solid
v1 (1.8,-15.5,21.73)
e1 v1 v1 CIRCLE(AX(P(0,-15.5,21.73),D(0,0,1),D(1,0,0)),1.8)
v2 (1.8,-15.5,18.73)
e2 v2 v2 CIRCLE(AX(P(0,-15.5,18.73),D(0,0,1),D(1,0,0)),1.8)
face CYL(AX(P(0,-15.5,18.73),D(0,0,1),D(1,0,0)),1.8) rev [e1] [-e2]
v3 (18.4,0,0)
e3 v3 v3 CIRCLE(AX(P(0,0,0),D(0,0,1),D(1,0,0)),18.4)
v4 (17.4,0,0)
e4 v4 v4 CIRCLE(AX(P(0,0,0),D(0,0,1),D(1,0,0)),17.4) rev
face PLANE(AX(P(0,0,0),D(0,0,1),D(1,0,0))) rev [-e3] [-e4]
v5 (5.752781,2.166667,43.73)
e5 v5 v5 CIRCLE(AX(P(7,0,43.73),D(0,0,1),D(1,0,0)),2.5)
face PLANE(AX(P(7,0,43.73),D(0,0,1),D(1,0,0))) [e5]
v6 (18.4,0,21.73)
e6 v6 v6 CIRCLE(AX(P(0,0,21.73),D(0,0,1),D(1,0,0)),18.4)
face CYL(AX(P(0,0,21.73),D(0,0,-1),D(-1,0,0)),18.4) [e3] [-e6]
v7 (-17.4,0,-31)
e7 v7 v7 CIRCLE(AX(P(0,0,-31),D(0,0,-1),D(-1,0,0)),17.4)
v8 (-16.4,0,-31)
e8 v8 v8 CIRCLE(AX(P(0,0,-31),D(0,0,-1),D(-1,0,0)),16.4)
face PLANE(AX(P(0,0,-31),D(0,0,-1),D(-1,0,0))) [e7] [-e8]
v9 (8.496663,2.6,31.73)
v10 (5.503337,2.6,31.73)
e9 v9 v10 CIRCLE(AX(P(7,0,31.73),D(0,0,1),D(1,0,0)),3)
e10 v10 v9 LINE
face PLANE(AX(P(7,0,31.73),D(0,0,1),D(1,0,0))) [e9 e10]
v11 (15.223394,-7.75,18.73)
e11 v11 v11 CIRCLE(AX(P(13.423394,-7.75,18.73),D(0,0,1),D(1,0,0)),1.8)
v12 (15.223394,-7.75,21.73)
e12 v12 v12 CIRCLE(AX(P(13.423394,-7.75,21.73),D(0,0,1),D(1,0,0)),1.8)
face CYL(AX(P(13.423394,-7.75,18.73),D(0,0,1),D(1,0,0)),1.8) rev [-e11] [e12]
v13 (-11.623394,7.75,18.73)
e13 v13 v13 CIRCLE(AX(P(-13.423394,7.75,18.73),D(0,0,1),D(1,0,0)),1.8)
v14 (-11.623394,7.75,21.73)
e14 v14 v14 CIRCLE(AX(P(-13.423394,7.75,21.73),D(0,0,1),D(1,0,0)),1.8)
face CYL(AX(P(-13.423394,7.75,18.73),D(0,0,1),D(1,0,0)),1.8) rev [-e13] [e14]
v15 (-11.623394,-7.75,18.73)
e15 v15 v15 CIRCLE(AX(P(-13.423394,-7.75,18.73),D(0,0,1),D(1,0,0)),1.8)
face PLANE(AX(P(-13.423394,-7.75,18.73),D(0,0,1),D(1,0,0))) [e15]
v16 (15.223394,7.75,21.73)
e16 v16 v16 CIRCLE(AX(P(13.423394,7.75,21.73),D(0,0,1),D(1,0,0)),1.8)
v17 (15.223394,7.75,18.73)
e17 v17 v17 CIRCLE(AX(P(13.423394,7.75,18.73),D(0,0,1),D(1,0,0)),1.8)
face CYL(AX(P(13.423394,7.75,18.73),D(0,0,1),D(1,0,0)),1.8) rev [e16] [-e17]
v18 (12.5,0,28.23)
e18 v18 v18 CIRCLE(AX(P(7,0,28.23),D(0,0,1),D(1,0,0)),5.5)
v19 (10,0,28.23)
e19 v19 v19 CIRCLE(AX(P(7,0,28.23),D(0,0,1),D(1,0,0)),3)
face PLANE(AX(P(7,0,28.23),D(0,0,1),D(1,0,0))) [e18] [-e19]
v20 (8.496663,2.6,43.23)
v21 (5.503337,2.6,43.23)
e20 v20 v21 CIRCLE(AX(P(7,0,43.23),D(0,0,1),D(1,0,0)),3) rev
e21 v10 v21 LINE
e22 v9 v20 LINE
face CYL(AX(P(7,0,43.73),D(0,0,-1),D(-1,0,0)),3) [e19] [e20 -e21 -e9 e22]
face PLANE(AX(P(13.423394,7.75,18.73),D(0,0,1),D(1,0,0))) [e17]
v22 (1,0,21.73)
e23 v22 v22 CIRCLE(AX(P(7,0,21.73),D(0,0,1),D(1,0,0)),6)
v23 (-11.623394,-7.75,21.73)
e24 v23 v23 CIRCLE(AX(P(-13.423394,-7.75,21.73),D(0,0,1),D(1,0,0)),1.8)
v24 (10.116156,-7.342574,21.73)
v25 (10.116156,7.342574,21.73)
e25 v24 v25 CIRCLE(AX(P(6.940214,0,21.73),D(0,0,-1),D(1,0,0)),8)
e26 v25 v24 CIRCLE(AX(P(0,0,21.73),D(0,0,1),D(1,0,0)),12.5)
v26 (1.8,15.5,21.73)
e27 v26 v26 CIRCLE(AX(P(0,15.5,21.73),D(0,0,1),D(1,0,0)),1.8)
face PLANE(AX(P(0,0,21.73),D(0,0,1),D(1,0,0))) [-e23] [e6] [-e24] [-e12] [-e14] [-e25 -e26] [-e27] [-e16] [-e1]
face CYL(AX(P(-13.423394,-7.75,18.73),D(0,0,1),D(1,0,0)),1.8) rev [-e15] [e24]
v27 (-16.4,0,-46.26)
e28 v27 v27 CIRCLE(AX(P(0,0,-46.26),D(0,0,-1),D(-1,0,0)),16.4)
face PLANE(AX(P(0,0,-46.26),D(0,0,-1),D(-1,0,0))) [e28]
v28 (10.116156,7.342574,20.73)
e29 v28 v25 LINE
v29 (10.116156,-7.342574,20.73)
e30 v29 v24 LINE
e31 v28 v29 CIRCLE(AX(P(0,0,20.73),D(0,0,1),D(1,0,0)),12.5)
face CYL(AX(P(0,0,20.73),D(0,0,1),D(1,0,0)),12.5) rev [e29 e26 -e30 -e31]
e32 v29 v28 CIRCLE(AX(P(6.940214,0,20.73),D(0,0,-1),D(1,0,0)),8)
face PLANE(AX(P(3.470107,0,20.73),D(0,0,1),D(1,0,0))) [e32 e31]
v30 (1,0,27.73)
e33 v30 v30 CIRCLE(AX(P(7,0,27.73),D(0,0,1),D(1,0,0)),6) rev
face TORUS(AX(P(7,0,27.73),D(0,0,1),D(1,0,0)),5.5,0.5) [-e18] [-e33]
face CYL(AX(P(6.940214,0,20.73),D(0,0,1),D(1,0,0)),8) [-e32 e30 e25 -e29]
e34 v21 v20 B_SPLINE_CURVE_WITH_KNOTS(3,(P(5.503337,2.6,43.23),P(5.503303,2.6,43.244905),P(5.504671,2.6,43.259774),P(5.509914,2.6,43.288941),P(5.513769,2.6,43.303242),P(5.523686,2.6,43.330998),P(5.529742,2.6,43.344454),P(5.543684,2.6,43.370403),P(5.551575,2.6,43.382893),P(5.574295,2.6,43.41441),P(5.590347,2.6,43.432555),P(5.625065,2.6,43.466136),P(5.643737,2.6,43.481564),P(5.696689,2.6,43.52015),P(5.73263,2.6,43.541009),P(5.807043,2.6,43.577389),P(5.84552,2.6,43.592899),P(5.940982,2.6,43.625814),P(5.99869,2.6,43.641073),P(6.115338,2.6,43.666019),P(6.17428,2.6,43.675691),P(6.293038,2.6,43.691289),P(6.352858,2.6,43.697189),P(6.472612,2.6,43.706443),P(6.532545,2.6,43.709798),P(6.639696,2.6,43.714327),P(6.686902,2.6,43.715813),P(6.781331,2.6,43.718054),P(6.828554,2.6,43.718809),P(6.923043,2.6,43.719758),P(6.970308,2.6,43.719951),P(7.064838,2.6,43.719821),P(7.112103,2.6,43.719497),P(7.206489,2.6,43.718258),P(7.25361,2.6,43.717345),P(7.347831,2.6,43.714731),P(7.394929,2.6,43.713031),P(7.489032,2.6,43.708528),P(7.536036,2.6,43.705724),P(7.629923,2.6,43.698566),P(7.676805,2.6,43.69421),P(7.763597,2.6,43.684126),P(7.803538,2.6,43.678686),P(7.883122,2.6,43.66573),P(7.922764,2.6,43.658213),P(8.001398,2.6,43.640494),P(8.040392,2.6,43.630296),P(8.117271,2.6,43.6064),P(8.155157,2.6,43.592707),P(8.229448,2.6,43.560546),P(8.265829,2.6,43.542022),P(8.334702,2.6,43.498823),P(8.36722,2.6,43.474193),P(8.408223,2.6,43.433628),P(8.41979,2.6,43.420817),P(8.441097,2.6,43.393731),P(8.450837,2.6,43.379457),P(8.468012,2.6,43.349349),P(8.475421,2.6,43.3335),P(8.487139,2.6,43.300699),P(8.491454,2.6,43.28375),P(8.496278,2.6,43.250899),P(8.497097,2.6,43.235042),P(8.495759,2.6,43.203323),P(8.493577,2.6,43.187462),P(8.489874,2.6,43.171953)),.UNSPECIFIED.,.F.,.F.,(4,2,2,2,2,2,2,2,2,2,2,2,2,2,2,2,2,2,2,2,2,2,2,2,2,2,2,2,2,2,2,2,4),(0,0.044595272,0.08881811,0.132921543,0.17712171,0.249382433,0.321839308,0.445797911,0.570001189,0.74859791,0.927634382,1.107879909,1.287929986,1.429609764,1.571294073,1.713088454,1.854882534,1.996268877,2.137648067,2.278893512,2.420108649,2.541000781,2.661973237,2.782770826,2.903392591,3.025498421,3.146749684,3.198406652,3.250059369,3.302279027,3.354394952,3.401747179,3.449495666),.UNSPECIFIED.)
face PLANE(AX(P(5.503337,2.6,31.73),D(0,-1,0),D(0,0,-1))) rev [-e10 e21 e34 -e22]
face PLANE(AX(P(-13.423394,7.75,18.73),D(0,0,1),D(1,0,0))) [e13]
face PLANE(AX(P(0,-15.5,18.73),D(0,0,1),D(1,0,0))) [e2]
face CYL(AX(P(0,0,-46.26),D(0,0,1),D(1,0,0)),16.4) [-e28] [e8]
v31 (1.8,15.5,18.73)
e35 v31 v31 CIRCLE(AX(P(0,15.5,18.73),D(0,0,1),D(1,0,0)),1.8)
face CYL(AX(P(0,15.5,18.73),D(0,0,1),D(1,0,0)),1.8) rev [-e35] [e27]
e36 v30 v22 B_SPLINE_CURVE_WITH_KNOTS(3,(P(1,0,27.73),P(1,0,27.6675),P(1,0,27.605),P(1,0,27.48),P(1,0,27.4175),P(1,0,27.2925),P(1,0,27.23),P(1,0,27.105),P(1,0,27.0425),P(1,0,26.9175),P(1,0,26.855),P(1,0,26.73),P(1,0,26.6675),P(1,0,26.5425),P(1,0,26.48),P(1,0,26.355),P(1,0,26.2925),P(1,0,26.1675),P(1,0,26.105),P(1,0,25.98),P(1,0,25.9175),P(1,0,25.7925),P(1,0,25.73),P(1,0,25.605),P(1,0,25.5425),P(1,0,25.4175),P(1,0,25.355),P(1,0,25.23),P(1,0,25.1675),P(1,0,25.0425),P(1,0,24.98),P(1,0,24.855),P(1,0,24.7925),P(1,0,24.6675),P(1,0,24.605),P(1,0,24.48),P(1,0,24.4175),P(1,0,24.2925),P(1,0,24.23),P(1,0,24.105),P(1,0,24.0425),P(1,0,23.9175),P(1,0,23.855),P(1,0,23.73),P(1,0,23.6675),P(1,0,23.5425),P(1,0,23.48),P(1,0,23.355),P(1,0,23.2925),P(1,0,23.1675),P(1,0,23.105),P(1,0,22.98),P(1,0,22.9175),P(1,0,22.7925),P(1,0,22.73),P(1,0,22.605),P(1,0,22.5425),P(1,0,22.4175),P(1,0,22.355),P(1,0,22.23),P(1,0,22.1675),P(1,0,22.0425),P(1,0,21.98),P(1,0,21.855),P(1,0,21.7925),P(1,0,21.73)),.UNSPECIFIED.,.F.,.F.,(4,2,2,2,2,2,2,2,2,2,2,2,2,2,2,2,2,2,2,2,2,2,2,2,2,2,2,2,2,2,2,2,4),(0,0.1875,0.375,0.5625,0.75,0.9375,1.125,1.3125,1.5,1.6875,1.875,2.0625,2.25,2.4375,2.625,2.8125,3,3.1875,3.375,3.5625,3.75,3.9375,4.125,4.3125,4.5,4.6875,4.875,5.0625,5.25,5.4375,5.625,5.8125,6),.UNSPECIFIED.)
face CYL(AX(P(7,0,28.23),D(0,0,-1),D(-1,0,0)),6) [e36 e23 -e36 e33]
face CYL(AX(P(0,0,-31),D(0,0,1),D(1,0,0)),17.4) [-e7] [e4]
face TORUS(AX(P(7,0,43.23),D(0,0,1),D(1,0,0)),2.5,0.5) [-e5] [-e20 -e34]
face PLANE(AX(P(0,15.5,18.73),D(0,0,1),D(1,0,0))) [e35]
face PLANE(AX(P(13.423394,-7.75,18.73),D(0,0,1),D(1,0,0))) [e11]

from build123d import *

# Parameters (mm, degrees)
SKETCH1_R            = 18.4
BOSS_EXTRUDE1_DEPTH  = 21.73
SKETCH2_R            = 17.4
BOSS_EXTRUDE2_DEPTH  = 31
SKETCH3_R            = 6
BOSS_EXTRUDE3_DEPTH  = 6.5
FILLET1_R            = 0.5
SKETCH4_R            = 3
BOSS_EXTRUDE4_DEPTH  = 15.5
CUT_EXTRUDE1_START   = -12
CUT_EXTRUDE1_DEPTH   = 12
CUT_EXTRUDE2_DEPTH   = 1
SKETCH9_R            = 4
BOSS_EXTRUDE5_DEPTH  = 1
FILLET2_R            = 0.5
SKETCH10_R           = 14
BOSS_EXTRUDE6_DEPTH  = 1.5
SKETCH11_W           = 3.5
SKETCH11_H           = 1
BOSS_EXTRUDE7_DEPTH  = 5.6
FILLET3_R            = 0.5
SKETCH13_R           = 9
BOSS_EXTRUDE8_DEPTH  = 3
SKETCH14_R           = 1.5
BOSS_EXTRUDE9_DEPTH  = 8.55
FILLET4_R            = 0.5
SKETCH15_R           = 16.4
BOSS_EXTRUDE10_DEPTH = 15.26
SKETCH17_R           = 1.8
CUT_EXTRUDE3_DEPTH   = 3


with BuildPart() as part:
    # Sketch1 → Boss-Extrude1 (new body)
    with BuildSketch(Plane.XY):
        Circle(SKETCH1_R)
    extrude(amount=BOSS_EXTRUDE1_DEPTH)

    # Sketch2 → Boss-Extrude2 (add)
    with BuildSketch(Plane(origin=(0, 0, 0), x_dir=(-1, 0, 0), z_dir=(0, 0, -1))):
        with Locations(Location((0, 0, 0), (0, 0, 180))):
            Circle(SKETCH2_R)
    extrude(amount=BOSS_EXTRUDE2_DEPTH)

    # Sketch3 → Boss-Extrude3 (add)
    with BuildSketch(Plane.XY.offset(21.73)):
        with Locations(Location((7, 0, 0), (0, 0, 180))):
            Circle(SKETCH3_R)
    extrude(amount=BOSS_EXTRUDE3_DEPTH)

    # Fillet1
    fillet1_edges = [part.edges().sort_by_distance(p)[0] for p in [
        (13, 0, 28.23),
    ]]
    fillet(fillet1_edges, radius=FILLET1_R)

    # Sketch4 → Boss-Extrude4 (add)
    with BuildSketch(Plane.XY.offset(28.23)):
        with Locations((7, 0)):
            Circle(SKETCH4_R)
    extrude(amount=BOSS_EXTRUDE4_DEPTH)

    # Sketch5 → Cut-Extrude1 (cut)
    with BuildSketch(Plane.XY.offset(43.73).offset(CUT_EXTRUDE1_START)):
        with BuildLine():
            Line((5.503337045, 2.6), (8.496662955, 2.6))
            ThreePointArc((8.496662955, 2.6), (7, 3), (5.503337045, 2.6))
        make_face()
    extrude(amount=CUT_EXTRUDE1_DEPTH, mode=Mode.SUBTRACT)

    # Sketch8 → Cut-Extrude2 (cut)
    with BuildSketch(Plane.XY.offset(21.73)):
        with BuildLine():
            ThreePointArc((10.116155685, 7.342574083), (-12.5, 0), (10.116155685, -7.342574083))
            ThreePointArc((10.116155685, -7.342574083), (-1.05978604, 0), (10.116155685, 7.342574083))
        make_face()
    extrude(amount=-CUT_EXTRUDE2_DEPTH, mode=Mode.SUBTRACT)

    # Sketch9 → Boss-Extrude5 (add)
    with BuildSketch(Plane(origin=(0, 0, -31), x_dir=(-1, 0, 0), z_dir=(0, 0, -1))):
        Circle(SKETCH9_R)
    extrude(amount=BOSS_EXTRUDE5_DEPTH)

    # Fillet2
    fillet2_edges = [part.edges().sort_by_distance(p)[0] for p in [
        (4, 0, -32),
    ]]
    fillet(fillet2_edges, radius=FILLET2_R)

    # Sketch11 → Boss-Extrude7 (add)
    with BuildSketch(Plane(origin=(0, 0, -31), x_dir=(-1, 0, 0), z_dir=(0, 0, -1))):
        with Locations((0, 12.05)):
            Rectangle(SKETCH11_W, SKETCH11_H)
        with Locations((0, -12.05)):
            Rectangle(SKETCH11_W, SKETCH11_H)
    extrude(amount=BOSS_EXTRUDE7_DEPTH)

    # Fillet3
    fillet3_edges = [part.edges().sort_by_distance(p)[0] for p in [
        (1.75, 12.05, -36.6),
        (-1.75, 12.05, -36.6),
        (-1.75, -12.05, -36.6),
        (1.75, -12.05, -36.6),
    ]]
    fillet(fillet3_edges, radius=FILLET3_R)

    # Sketch14 → Boss-Extrude9 (add)
    with BuildSketch(Plane(origin=(0, 0, -32), x_dir=(-1, 0, 0), z_dir=(0, 0, -1))):
        Circle(SKETCH14_R)
    extrude(amount=BOSS_EXTRUDE9_DEPTH)

    # Fillet4
    # the kernel refuses this fillet: 0.5 mm, written as the material it takes off along each edge
    with BuildSketch(Plane(origin=(7, 0, 43.73), x_dir=(0.4622655728594592, 0.8867415295050277, 0), z_dir=(0.8867415295050277, -0.4622655728594592, 0))) as fillet4_piece_1:
        with BuildLine():
            CenterArc((3 - FILLET4_R, -FILLET4_R), FILLET4_R, 0, 90)
            Line((3 - FILLET4_R, 0), (3 - FILLET4_R, FILLET4_R * 0.02))
            Line((3 - FILLET4_R, FILLET4_R * 0.02), (3 + FILLET4_R * 0.02, FILLET4_R * 0.02))
            Line((3 + FILLET4_R * 0.02, FILLET4_R * 0.02), (3 + FILLET4_R * 0.02, -FILLET4_R))
            Line((3 + FILLET4_R * 0.02, -FILLET4_R), (3, -FILLET4_R))
        make_face()
    revolve(axis=Axis((7, 0, 43.73), (0, 0, 1)), revolution_arc=297.533397677, mode=Mode.SUBTRACT)
    with BuildSketch(Plane(origin=(7, 0, 43.73), x_dir=(1, 0, 0), z_dir=(0, -1, 0))) as fillet4_piece_2:
        with BuildLine():
            CenterArc((3 - FILLET4_R, -FILLET4_R), FILLET4_R, 0, 90)
            Line((3 - FILLET4_R, 0), (3 - FILLET4_R, FILLET4_R * 0.02))
            Line((3 - FILLET4_R, FILLET4_R * 0.02), (3 + FILLET4_R * 0.02, FILLET4_R * 0.02))
            Line((3 + FILLET4_R * 0.02, FILLET4_R * 0.02), (3 + FILLET4_R * 0.02, -FILLET4_R))
            Line((3 + FILLET4_R * 0.02, -FILLET4_R), (3, -FILLET4_R))
        make_face()
    revolve(axis=Axis((7, 0, 43.73), (0, 0, 1)), revolution_arc=117.379597562, mode=Mode.SUBTRACT)



with BuildPart() as body_2:
    # Sketch10 → Boss-Extrude6 (new body)
    with BuildSketch(Plane(origin=(0, 0, -34), x_dir=(-1, 0, 0), z_dir=(0, 0, -1))):
        Circle(SKETCH10_R)
    extrude(amount=BOSS_EXTRUDE6_DEPTH)


with BuildPart() as body_3:
    # Sketch13 → Boss-Extrude8 (new body)
    with BuildSketch(Plane(origin=(0, 0, -37.5), x_dir=(-1, 0, 0), z_dir=(0, 0, -1))):
        Circle(SKETCH13_R)
    extrude(amount=BOSS_EXTRUDE8_DEPTH)


with BuildPart() as part_1:
    add(part.part)

    add(body_2.part)  # Boss-Extrude10 merges body 2

    add(body_3.part)  # Boss-Extrude10 merges body 3
    # Sketch15 → Boss-Extrude10 (add)
    with BuildSketch(Plane(origin=(0, 0, -31), x_dir=(-1, 0, 0), z_dir=(0, 0, -1))):
        Circle(SKETCH15_R)
    extrude(amount=BOSS_EXTRUDE10_DEPTH)

    # Sketch17 → Cut-Extrude3 (cut)
    with BuildSketch(Plane.XY.offset(21.73)):
        with Locations((0, -15.5)):
            Circle(SKETCH17_R)
        with Locations((-13.423393759, -7.75)):
            Circle(SKETCH17_R)
        with Locations((-13.423393759, 7.75)):
            Circle(SKETCH17_R)
        with Locations((0, 15.5)):
            Circle(SKETCH17_R)
        with Locations((13.423393759, 7.75)):
            Circle(SKETCH17_R)
        with Locations((13.423393759, -7.75)):
            Circle(SKETCH17_R)
    extrude(amount=-CUT_EXTRUDE3_DEPTH, mode=Mode.SUBTRACT)


solid = part_1.part
